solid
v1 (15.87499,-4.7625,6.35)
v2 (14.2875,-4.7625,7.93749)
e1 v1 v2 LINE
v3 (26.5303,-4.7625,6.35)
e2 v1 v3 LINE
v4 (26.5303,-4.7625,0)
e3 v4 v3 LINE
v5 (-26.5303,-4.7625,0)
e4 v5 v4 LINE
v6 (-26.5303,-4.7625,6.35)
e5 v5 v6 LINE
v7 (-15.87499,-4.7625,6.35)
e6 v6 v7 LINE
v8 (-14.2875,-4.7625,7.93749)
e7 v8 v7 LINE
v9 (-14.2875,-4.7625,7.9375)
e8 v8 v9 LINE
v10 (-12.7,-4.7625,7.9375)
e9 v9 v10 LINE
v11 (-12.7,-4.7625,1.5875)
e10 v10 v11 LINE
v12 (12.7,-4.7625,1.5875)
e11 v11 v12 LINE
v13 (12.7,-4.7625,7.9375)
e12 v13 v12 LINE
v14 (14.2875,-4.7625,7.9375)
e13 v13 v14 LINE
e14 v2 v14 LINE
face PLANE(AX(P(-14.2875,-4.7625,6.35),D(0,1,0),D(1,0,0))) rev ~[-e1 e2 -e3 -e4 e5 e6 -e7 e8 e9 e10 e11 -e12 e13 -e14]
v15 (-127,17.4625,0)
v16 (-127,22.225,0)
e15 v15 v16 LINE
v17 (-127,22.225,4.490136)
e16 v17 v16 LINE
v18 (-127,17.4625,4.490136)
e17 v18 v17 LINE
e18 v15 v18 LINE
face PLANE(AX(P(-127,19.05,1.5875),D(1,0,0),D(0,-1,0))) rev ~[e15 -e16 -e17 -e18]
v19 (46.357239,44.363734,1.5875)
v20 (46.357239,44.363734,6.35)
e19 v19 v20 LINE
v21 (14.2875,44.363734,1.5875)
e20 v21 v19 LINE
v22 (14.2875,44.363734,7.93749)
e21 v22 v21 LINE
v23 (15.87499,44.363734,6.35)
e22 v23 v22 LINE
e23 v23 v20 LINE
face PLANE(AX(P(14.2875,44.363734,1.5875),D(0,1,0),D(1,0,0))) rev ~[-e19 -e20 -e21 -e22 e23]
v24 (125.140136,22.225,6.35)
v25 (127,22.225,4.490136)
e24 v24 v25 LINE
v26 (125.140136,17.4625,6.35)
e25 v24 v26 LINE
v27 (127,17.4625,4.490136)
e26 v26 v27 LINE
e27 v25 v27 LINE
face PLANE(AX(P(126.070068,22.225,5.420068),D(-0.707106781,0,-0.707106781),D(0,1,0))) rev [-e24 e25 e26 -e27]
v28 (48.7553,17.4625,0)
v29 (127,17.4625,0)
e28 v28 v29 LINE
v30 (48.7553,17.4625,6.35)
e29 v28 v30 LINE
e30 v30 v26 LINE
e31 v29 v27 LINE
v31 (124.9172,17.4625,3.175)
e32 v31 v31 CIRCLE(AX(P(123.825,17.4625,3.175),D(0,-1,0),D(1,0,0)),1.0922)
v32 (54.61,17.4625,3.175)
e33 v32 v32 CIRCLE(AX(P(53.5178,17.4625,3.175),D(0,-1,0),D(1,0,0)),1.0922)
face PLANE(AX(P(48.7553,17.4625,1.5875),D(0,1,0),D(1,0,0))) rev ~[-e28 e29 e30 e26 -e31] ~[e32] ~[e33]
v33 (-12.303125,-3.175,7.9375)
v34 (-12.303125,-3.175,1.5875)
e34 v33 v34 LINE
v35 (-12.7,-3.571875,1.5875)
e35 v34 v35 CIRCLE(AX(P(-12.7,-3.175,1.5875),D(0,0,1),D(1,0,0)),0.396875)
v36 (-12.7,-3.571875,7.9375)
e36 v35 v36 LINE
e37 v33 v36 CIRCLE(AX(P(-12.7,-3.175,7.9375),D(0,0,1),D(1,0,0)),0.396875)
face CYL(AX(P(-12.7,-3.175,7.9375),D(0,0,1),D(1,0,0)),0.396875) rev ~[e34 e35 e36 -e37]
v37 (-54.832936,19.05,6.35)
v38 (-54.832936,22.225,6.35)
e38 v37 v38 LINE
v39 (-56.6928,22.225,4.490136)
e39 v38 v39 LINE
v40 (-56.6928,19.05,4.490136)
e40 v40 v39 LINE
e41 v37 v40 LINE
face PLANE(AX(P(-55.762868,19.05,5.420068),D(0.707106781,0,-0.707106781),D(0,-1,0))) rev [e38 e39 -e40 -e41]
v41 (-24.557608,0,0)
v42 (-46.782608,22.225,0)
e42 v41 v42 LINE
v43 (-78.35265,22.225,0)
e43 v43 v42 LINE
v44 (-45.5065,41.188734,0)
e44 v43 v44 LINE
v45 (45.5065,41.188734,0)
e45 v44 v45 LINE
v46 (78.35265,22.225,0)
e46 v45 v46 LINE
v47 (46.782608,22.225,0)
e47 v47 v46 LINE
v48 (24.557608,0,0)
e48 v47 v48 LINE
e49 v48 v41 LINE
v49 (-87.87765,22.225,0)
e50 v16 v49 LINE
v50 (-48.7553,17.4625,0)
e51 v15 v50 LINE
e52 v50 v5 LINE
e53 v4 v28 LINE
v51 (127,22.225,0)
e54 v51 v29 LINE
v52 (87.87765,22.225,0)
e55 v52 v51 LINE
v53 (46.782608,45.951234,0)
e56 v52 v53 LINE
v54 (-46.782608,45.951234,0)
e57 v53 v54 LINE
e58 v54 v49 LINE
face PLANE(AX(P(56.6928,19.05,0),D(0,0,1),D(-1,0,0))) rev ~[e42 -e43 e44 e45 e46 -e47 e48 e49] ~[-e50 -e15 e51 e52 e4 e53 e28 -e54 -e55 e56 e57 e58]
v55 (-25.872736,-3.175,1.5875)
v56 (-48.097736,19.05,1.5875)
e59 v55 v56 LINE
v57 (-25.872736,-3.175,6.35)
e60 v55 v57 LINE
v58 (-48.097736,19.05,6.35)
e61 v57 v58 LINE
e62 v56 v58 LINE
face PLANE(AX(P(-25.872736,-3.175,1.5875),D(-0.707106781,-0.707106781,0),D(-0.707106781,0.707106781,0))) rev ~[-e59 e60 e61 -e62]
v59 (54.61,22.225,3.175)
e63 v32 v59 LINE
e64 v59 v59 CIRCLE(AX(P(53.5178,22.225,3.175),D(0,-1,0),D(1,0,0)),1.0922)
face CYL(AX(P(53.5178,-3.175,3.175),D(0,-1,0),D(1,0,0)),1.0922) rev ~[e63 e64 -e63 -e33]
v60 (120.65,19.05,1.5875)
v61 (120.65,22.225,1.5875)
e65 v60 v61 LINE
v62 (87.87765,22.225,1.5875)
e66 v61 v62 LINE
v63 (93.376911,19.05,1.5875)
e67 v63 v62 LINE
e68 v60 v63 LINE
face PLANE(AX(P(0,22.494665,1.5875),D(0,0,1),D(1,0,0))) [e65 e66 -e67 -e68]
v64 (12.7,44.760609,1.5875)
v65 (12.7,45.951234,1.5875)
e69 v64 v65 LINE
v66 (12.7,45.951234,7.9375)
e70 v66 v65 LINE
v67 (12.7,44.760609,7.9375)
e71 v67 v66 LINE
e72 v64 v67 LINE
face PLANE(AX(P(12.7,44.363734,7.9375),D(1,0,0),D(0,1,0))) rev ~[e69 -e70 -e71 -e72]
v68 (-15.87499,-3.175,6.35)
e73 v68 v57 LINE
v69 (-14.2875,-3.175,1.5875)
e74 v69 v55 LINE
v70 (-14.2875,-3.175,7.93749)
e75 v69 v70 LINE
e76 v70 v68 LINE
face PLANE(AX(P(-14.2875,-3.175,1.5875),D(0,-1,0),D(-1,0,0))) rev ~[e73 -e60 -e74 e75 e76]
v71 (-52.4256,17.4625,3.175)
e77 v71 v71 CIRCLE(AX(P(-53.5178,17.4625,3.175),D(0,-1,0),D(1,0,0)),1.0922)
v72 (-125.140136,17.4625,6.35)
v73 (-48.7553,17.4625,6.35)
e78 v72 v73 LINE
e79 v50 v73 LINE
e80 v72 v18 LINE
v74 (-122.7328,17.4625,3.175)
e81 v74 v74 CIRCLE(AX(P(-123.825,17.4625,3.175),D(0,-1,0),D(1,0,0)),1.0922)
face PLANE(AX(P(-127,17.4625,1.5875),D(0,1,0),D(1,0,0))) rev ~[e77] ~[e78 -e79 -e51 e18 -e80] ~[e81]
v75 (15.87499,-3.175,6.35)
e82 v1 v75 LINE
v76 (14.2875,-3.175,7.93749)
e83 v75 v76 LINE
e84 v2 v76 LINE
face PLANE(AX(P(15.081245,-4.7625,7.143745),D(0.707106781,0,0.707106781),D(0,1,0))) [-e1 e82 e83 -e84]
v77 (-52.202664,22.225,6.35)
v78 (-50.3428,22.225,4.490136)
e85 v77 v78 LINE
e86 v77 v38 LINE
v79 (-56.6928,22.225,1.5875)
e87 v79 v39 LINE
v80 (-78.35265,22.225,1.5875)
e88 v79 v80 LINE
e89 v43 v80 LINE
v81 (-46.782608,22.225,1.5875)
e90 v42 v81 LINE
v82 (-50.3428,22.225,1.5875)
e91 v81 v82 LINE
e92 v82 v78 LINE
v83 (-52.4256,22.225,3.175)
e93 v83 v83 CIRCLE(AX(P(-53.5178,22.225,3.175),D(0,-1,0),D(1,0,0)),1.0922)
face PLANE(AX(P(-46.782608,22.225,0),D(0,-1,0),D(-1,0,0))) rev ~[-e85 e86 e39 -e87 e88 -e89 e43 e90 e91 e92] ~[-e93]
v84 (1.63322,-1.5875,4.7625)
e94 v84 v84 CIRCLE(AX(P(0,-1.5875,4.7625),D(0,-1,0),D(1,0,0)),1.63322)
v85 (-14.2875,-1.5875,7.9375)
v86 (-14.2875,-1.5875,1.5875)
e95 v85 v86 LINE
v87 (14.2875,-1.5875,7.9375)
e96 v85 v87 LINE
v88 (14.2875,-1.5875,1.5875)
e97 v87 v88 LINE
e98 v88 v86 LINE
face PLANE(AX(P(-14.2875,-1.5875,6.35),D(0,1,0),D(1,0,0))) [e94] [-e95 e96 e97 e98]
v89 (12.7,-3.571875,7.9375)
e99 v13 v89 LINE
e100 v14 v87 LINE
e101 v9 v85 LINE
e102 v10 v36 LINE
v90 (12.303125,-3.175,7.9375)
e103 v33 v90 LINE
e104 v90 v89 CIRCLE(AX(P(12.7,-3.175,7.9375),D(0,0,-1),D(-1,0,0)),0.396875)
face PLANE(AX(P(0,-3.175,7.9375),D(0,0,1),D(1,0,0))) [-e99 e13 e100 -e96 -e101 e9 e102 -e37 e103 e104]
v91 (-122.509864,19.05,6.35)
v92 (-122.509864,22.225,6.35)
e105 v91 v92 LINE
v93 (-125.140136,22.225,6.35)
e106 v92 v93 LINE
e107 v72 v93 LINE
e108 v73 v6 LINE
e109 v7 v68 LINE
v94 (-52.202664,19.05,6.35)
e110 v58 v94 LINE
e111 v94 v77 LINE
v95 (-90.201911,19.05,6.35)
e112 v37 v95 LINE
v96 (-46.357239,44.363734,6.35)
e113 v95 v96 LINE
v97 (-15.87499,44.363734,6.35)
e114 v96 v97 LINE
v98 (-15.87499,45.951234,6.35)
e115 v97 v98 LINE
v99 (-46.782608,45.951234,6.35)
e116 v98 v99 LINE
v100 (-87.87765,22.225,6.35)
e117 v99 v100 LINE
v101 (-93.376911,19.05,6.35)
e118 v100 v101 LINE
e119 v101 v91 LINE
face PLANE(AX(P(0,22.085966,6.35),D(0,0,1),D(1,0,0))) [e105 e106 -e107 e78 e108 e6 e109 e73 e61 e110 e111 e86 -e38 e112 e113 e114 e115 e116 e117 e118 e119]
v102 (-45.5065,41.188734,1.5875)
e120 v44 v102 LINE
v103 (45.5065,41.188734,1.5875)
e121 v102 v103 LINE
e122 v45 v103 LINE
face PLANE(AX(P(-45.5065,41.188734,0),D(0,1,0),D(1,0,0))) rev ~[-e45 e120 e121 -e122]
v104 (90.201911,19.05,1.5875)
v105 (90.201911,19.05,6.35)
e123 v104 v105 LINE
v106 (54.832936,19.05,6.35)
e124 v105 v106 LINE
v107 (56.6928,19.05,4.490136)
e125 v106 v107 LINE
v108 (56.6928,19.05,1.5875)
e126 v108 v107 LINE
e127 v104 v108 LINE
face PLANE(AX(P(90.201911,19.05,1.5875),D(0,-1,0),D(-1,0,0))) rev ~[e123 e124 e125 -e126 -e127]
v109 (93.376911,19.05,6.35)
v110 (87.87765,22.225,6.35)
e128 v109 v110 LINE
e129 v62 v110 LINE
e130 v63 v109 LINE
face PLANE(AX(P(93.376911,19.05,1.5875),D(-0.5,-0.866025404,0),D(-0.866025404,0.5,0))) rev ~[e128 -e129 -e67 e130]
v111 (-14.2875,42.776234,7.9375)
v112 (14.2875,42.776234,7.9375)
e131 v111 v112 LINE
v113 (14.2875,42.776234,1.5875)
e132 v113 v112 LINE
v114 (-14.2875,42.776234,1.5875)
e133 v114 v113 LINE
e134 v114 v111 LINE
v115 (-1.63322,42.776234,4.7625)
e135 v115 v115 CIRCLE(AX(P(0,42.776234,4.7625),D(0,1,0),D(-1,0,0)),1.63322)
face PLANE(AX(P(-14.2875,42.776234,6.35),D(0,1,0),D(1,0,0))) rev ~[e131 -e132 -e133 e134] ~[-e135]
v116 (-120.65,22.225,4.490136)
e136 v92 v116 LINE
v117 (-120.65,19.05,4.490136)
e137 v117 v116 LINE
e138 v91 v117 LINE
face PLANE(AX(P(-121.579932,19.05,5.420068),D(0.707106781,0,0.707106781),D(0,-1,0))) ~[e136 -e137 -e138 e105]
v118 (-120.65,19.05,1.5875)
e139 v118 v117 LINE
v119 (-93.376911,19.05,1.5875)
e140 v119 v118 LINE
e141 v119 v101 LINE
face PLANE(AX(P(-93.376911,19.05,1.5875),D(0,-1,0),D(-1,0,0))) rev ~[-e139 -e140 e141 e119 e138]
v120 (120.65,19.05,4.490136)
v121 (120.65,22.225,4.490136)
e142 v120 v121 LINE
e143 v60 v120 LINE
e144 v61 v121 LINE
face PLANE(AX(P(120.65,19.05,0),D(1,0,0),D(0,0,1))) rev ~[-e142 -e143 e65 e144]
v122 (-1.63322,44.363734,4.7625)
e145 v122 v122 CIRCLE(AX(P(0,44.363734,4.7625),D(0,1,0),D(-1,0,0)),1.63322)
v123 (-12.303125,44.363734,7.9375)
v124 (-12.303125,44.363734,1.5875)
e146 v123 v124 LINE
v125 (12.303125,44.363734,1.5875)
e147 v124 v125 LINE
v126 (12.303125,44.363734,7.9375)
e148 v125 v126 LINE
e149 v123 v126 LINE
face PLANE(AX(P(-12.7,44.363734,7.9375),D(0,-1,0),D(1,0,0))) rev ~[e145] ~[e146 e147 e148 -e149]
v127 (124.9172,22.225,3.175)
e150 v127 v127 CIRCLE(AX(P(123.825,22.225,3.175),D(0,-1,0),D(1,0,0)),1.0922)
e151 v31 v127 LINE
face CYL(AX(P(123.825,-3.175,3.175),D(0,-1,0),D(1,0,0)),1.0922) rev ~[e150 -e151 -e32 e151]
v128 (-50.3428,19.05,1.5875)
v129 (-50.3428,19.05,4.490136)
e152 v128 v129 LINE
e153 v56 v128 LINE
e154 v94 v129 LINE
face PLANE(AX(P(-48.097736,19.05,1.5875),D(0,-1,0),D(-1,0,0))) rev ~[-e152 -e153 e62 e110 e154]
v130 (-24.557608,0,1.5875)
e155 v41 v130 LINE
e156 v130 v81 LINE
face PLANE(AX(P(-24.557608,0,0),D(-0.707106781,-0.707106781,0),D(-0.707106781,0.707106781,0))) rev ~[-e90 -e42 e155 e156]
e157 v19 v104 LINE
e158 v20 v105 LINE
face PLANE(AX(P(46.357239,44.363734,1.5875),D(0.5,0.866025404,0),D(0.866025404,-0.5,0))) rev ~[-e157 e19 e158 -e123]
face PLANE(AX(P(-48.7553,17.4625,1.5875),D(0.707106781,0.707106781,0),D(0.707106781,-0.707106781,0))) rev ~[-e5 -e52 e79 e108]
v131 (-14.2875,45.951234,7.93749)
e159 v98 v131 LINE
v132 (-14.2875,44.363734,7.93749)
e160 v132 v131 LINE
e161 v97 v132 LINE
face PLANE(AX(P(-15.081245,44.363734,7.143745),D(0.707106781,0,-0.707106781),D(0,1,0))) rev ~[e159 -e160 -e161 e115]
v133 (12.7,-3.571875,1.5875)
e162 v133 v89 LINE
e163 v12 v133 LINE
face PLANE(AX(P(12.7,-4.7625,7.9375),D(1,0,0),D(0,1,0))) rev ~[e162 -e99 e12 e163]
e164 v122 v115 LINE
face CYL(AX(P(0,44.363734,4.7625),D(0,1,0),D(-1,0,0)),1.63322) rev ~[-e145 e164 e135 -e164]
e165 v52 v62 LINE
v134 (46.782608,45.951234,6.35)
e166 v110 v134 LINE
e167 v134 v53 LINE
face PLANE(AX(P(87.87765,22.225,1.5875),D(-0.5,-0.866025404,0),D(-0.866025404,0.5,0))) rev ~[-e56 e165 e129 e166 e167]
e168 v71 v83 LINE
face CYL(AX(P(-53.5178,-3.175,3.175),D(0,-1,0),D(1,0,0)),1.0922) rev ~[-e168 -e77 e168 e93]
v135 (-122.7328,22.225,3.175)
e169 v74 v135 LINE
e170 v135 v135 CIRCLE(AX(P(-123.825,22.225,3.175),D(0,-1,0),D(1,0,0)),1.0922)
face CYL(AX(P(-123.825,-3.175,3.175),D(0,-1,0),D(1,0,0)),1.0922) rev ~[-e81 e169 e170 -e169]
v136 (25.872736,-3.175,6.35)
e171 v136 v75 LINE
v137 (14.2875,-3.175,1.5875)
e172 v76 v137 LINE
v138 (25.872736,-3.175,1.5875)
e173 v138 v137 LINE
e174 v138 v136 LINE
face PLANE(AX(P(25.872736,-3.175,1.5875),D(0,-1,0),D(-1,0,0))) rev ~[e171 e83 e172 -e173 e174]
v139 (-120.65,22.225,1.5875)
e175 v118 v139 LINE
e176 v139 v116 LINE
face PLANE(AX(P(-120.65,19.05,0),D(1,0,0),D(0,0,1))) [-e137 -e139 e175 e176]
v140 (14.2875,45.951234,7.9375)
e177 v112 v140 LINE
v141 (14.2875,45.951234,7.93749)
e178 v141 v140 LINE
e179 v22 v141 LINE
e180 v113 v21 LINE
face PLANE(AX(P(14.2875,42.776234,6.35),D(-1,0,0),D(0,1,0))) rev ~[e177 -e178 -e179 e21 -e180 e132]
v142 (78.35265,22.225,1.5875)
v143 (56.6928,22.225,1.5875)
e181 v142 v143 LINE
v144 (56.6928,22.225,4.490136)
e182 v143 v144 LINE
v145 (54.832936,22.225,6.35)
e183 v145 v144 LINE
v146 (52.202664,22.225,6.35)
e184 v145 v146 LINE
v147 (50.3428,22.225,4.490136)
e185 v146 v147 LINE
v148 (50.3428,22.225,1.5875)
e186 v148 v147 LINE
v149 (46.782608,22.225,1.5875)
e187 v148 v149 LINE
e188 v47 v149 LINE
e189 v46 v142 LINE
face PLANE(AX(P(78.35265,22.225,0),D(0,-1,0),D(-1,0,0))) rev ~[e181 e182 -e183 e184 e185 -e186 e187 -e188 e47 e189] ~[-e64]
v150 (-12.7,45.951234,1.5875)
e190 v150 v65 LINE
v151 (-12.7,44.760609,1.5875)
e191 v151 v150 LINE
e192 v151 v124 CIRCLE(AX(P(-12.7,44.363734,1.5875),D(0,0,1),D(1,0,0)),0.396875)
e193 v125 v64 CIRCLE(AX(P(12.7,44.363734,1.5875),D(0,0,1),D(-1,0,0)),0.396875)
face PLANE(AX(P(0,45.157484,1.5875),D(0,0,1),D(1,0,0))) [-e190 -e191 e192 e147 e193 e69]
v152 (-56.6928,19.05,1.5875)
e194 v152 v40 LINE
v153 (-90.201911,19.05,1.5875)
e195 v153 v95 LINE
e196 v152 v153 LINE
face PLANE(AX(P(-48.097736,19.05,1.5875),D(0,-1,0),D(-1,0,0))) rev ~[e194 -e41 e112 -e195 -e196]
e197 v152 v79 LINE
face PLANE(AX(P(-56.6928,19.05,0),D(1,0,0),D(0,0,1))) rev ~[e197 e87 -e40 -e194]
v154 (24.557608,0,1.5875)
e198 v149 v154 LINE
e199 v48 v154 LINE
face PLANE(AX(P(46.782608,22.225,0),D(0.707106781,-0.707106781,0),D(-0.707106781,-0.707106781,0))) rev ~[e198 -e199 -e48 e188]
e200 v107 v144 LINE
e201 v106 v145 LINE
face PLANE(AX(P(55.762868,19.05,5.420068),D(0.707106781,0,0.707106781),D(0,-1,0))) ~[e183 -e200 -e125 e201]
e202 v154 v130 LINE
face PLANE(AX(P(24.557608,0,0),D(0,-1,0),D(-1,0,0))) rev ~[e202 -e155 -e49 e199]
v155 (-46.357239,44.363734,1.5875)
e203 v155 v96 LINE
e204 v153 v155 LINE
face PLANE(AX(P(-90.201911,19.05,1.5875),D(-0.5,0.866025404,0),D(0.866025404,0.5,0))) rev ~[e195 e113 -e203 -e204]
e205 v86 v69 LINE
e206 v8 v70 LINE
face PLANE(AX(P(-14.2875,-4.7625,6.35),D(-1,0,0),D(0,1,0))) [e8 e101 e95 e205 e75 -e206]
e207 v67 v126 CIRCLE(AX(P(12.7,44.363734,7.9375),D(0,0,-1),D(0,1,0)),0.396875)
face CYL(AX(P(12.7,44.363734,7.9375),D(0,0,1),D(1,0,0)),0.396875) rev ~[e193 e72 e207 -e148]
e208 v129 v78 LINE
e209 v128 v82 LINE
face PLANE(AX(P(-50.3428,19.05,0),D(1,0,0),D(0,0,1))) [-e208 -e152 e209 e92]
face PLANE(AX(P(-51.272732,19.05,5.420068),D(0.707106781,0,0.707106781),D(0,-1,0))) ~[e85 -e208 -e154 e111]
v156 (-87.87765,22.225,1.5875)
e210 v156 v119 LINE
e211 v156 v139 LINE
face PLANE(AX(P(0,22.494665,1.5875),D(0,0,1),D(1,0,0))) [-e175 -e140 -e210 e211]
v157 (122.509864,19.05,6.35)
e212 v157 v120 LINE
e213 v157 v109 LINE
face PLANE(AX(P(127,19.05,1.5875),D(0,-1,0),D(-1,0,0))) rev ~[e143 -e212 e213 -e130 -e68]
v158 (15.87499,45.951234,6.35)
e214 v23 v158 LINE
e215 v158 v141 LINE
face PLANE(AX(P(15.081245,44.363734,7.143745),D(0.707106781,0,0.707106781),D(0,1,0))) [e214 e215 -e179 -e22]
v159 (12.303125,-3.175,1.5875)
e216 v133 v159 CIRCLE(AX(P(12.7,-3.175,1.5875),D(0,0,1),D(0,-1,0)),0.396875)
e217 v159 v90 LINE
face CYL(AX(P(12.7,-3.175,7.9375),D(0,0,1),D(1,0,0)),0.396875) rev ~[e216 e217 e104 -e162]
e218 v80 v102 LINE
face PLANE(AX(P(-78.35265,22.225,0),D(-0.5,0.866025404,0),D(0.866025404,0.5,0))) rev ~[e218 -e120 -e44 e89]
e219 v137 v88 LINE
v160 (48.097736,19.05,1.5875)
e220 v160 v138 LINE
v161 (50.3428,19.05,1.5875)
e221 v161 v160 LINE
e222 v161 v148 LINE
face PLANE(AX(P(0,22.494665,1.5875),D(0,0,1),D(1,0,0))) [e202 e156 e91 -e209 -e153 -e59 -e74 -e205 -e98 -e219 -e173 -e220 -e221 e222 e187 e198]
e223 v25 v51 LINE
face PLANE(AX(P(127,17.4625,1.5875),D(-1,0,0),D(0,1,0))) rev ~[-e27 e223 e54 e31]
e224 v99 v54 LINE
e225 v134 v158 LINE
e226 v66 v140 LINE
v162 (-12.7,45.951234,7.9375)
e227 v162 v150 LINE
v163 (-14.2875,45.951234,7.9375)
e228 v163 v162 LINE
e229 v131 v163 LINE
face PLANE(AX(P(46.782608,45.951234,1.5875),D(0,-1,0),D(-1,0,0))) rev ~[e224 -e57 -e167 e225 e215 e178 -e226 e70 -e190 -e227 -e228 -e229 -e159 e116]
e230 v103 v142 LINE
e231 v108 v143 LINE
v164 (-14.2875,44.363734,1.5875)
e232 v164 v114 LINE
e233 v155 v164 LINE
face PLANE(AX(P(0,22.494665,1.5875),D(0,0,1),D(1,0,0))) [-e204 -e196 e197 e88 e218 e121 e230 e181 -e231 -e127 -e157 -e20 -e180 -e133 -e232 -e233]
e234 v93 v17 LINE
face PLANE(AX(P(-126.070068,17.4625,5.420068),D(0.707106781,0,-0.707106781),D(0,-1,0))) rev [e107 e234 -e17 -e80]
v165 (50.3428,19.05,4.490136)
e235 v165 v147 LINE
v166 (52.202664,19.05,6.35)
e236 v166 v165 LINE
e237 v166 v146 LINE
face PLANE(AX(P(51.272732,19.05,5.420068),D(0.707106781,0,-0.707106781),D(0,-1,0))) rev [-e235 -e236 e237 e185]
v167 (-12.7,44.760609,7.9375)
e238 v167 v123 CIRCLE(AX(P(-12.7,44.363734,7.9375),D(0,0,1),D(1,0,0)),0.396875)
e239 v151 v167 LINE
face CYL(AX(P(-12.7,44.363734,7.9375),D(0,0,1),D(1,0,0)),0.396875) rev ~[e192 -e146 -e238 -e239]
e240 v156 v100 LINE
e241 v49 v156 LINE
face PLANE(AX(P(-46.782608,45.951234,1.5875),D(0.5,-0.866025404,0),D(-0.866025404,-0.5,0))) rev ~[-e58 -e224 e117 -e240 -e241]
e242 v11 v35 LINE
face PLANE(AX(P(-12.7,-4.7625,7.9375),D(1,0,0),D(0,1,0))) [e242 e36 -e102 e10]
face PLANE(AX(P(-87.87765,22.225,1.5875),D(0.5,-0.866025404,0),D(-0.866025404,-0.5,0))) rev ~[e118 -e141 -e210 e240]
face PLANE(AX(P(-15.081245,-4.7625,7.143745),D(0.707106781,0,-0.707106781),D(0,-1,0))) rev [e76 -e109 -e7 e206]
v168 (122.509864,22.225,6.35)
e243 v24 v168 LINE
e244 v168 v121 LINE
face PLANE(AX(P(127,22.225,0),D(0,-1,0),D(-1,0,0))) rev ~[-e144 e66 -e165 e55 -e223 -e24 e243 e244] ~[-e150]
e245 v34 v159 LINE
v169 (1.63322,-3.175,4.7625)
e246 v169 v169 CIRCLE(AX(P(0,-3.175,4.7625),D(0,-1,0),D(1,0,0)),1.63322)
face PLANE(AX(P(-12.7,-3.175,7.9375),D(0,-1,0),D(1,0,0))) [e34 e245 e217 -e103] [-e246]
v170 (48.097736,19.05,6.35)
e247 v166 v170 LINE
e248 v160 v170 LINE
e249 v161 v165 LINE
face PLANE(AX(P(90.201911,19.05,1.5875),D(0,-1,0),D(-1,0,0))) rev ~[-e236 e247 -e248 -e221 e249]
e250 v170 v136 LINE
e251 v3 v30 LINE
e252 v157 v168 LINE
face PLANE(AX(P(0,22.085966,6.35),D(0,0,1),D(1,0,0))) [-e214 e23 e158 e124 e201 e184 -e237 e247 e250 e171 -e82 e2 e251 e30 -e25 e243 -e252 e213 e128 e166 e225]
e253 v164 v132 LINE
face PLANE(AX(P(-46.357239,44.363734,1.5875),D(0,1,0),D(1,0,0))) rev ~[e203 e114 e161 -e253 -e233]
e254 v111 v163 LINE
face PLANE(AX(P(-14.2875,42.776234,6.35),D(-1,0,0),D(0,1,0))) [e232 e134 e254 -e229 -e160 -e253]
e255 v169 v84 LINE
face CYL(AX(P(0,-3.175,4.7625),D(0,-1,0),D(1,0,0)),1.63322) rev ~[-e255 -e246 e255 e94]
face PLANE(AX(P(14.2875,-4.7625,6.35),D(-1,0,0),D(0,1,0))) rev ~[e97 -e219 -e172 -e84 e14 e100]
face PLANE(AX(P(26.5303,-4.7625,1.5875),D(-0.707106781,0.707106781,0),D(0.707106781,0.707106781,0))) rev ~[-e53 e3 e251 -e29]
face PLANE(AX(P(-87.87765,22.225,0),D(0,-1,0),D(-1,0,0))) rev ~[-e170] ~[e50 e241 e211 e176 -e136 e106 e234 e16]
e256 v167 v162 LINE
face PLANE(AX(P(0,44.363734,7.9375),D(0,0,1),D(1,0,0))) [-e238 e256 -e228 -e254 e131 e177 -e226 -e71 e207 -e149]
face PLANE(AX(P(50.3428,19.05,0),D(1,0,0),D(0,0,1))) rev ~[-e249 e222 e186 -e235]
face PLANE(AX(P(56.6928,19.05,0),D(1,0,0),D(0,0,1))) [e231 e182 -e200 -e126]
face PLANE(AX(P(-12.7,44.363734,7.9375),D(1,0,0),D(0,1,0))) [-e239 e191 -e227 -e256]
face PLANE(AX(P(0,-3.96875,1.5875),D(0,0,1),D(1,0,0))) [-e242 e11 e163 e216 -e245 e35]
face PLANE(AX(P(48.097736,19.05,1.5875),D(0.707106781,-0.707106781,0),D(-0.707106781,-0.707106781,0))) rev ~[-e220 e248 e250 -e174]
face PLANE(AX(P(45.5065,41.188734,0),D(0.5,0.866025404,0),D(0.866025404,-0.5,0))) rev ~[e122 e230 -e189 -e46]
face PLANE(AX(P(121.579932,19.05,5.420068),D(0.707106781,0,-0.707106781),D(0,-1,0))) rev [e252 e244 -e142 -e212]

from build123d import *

# Parameters (mm, degrees)
F1_DEPTH  = 1.5875
F3_DEPTH  = 4.7625
F4_W      = 6.35
F4_H      = 6.35
F5_DEPTH  = 3.175
F6_SIZE   = 1.8598642
F7_W      = 28.575
F7_H      = 3.175
F8_DEPTH  = 1.5875
F9_W      = 25.4
F9_H      = 1.5875
F10_DEPTH = 6.35
F11_R     = 1.0922
F11_R_2   = 1.63322
F12_DEPTH = 25.4
F13_SIZE  = 1.58749
F14_R     = 0.396875
F15_DEPTH = 6.35
F16_R     = 1.63322
F17_DEPTH = 1.5875


# Not quite as in the source:
# - a fillet or chamfer is up to 0.001 mm smaller than in the source, because OpenCascade refuses the exact size


with BuildPart() as f1:
    # F0 (on Top) → F1 (new body)
    with BuildSketch(Plane.XY):
        Polygon((-87.87765, 22.225), (-127, 22.225), (-127, 17.4625), (-48.7553, 17.4625), (-26.5303, -4.7625), (26.5303, -4.7625), (48.7553, 17.4625), (127, 17.4625), (127, 22.225), (87.87765, 22.225), (46.7826079092, 45.9512336135), (-46.7826079092, 45.9512336135), align=None)
        Polygon((-24.5576079092, 0), (-46.7826079092, 22.225), (-78.35265, 22.225), (-45.5064998802, 41.1887336135), (45.5064998802, 41.1887336135), (78.35265, 22.225), (46.7826079092, 22.225), (24.5576079092, 0), align=None, mode=Mode.SUBTRACT)
    extrude(amount=F1_DEPTH)

    # F2 (on face) → F3 (join)
    with BuildSketch(Plane.XY.offset(1.5875)):
        Polygon((-127, 19.05), (-127, 17.4625), (-48.7553, 17.4625), (-26.5303, -4.7625), (26.5303, -4.7625), (48.7553, 17.4625), (127, 17.4625), (127, 19.05), (93.376911314, 19.05), (87.87765, 22.225), (46.7826079092, 45.9512336135), (-46.7826079092, 45.9512336135), (-87.87765, 22.225), (-93.376911314, 19.05), align=None)
        Polygon((90.201911314, 19.05), (48.0977359697, 19.05), (25.8727359697, -3.175), (14.2875, -3.175), (14.2875, -1.5875), (-14.2875, -1.5875), (-14.2875, -3.175), (-25.8727359697, -3.175), (-48.0977359697, 19.05), (-90.201911314, 19.05), (-46.3572385662, 44.3637336135), (-14.2875, 44.3637336135), (-14.2875, 42.7762336135), (14.2875, 42.7762336135), (14.2875, 44.3637336135), (46.3572385662, 44.3637336135), align=None, mode=Mode.SUBTRACT)
    extrude(amount=F3_DEPTH)

    # F4 (on face) → F5 (join, through all)
    with BuildSketch(Plane(origin=(0, 19.05, 0), x_dir=(-1, 0, 0), z_dir=(0, 1, 0))):
        with Locations((-53.5178, 3.175)):
            Rectangle(F4_W, F4_H)
        with Locations((-123.825, 3.175)):
            Rectangle(F4_W, F4_H)
        with Locations((123.825, 3.175)):
            Rectangle(F4_W, F4_H)
        with Locations((53.5178, 3.175)):
            Rectangle(F4_W, F4_H)
    extrude(amount=F5_DEPTH)

    # F6
    f6_edges = [f1.edges().sort_by_distance(p)[0] for p in [
        (-127, 19.84375, 6.35),
        (-120.65, 20.6375, 6.35),
        (-56.6928, 20.6375, 6.35),
        (-50.3428, 20.6375, 6.35),
        (50.3428, 20.6375, 6.35),
        (56.6928, 20.6375, 6.35),
        (120.65, 20.6375, 6.35),
        (127, 19.84375, 6.35),
    ]]
    chamfer(f6_edges, length=F6_SIZE)

    # F7 (on face) → F8 (join)
    with BuildSketch(Plane.XY.offset(6.35)):
        with Locations((0, -3.175)):
            Rectangle(F7_W, F7_H)
        with Locations((0, 44.3637336135)):
            Rectangle(F7_W, F7_H)
    extrude(amount=F8_DEPTH)

    # F9 (on face) → F10 (cut, through all)
    with BuildSketch(Plane.XY.offset(7.9375)):
        with Locations((0, -3.96875)):
            Rectangle(F9_W, F9_H)
        with Locations((0, 45.1574836135)):
            Rectangle(F9_W, F9_H)
    extrude(amount=-F10_DEPTH, mode=Mode.SUBTRACT)

    # F11 (on face) → F12 (cut, through all)
    with BuildSketch(Plane.XZ.offset(3.175)):
        with Locations((53.5178, 3.175)):
            Circle(F11_R)
        with Locations((123.825, 3.175)):
            Circle(F11_R)
        with Locations((-123.825, 3.175)):
            Circle(F11_R)
        with Locations((-53.5178, 3.175)):
            Circle(F11_R)
        with Locations((0, 4.7625)):
            Circle(F11_R_2)
    extrude(amount=-F12_DEPTH, mode=Mode.SUBTRACT)

    # F13 (size 1.5875 in the source; OpenCascade refuses exactly that, so slightly less here)
    f13_edges = [f1.edges().sort_by_distance(p)[0] for p in [
        (-14.2875, -3.96875, 6.35),
        (14.2875, -3.96875, 6.35),
        (-14.2875, 45.157484, 6.35),
        (14.2875, 45.157484, 6.35),
    ]]
    chamfer(f13_edges, length=F13_SIZE)

    # F14 (on face) → F15 (cut, through all)
    with BuildSketch(Plane.XY.offset(7.9375)):
        with Locations((-12.7, -3.175)):
            Circle(F14_R)
        with Locations((12.7, -3.175)):
            Circle(F14_R)
        with Locations((-12.7, 44.3637336135)):
            Circle(F14_R)
        with Locations((12.7, 44.3637336135)):
            Circle(F14_R)
    extrude(amount=-F15_DEPTH, mode=Mode.SUBTRACT)

    # F16 (on face) → F17 (cut, through all)
    with BuildSketch(Plane(origin=(0, 44.3637336135, 0), x_dir=(-1, 0, 0), z_dir=(0, 1, 0))):
        with Locations((0, 4.7625)):
            Circle(F16_R)
    extrude(amount=-F17_DEPTH, mode=Mode.SUBTRACT)


solid = f1.part
